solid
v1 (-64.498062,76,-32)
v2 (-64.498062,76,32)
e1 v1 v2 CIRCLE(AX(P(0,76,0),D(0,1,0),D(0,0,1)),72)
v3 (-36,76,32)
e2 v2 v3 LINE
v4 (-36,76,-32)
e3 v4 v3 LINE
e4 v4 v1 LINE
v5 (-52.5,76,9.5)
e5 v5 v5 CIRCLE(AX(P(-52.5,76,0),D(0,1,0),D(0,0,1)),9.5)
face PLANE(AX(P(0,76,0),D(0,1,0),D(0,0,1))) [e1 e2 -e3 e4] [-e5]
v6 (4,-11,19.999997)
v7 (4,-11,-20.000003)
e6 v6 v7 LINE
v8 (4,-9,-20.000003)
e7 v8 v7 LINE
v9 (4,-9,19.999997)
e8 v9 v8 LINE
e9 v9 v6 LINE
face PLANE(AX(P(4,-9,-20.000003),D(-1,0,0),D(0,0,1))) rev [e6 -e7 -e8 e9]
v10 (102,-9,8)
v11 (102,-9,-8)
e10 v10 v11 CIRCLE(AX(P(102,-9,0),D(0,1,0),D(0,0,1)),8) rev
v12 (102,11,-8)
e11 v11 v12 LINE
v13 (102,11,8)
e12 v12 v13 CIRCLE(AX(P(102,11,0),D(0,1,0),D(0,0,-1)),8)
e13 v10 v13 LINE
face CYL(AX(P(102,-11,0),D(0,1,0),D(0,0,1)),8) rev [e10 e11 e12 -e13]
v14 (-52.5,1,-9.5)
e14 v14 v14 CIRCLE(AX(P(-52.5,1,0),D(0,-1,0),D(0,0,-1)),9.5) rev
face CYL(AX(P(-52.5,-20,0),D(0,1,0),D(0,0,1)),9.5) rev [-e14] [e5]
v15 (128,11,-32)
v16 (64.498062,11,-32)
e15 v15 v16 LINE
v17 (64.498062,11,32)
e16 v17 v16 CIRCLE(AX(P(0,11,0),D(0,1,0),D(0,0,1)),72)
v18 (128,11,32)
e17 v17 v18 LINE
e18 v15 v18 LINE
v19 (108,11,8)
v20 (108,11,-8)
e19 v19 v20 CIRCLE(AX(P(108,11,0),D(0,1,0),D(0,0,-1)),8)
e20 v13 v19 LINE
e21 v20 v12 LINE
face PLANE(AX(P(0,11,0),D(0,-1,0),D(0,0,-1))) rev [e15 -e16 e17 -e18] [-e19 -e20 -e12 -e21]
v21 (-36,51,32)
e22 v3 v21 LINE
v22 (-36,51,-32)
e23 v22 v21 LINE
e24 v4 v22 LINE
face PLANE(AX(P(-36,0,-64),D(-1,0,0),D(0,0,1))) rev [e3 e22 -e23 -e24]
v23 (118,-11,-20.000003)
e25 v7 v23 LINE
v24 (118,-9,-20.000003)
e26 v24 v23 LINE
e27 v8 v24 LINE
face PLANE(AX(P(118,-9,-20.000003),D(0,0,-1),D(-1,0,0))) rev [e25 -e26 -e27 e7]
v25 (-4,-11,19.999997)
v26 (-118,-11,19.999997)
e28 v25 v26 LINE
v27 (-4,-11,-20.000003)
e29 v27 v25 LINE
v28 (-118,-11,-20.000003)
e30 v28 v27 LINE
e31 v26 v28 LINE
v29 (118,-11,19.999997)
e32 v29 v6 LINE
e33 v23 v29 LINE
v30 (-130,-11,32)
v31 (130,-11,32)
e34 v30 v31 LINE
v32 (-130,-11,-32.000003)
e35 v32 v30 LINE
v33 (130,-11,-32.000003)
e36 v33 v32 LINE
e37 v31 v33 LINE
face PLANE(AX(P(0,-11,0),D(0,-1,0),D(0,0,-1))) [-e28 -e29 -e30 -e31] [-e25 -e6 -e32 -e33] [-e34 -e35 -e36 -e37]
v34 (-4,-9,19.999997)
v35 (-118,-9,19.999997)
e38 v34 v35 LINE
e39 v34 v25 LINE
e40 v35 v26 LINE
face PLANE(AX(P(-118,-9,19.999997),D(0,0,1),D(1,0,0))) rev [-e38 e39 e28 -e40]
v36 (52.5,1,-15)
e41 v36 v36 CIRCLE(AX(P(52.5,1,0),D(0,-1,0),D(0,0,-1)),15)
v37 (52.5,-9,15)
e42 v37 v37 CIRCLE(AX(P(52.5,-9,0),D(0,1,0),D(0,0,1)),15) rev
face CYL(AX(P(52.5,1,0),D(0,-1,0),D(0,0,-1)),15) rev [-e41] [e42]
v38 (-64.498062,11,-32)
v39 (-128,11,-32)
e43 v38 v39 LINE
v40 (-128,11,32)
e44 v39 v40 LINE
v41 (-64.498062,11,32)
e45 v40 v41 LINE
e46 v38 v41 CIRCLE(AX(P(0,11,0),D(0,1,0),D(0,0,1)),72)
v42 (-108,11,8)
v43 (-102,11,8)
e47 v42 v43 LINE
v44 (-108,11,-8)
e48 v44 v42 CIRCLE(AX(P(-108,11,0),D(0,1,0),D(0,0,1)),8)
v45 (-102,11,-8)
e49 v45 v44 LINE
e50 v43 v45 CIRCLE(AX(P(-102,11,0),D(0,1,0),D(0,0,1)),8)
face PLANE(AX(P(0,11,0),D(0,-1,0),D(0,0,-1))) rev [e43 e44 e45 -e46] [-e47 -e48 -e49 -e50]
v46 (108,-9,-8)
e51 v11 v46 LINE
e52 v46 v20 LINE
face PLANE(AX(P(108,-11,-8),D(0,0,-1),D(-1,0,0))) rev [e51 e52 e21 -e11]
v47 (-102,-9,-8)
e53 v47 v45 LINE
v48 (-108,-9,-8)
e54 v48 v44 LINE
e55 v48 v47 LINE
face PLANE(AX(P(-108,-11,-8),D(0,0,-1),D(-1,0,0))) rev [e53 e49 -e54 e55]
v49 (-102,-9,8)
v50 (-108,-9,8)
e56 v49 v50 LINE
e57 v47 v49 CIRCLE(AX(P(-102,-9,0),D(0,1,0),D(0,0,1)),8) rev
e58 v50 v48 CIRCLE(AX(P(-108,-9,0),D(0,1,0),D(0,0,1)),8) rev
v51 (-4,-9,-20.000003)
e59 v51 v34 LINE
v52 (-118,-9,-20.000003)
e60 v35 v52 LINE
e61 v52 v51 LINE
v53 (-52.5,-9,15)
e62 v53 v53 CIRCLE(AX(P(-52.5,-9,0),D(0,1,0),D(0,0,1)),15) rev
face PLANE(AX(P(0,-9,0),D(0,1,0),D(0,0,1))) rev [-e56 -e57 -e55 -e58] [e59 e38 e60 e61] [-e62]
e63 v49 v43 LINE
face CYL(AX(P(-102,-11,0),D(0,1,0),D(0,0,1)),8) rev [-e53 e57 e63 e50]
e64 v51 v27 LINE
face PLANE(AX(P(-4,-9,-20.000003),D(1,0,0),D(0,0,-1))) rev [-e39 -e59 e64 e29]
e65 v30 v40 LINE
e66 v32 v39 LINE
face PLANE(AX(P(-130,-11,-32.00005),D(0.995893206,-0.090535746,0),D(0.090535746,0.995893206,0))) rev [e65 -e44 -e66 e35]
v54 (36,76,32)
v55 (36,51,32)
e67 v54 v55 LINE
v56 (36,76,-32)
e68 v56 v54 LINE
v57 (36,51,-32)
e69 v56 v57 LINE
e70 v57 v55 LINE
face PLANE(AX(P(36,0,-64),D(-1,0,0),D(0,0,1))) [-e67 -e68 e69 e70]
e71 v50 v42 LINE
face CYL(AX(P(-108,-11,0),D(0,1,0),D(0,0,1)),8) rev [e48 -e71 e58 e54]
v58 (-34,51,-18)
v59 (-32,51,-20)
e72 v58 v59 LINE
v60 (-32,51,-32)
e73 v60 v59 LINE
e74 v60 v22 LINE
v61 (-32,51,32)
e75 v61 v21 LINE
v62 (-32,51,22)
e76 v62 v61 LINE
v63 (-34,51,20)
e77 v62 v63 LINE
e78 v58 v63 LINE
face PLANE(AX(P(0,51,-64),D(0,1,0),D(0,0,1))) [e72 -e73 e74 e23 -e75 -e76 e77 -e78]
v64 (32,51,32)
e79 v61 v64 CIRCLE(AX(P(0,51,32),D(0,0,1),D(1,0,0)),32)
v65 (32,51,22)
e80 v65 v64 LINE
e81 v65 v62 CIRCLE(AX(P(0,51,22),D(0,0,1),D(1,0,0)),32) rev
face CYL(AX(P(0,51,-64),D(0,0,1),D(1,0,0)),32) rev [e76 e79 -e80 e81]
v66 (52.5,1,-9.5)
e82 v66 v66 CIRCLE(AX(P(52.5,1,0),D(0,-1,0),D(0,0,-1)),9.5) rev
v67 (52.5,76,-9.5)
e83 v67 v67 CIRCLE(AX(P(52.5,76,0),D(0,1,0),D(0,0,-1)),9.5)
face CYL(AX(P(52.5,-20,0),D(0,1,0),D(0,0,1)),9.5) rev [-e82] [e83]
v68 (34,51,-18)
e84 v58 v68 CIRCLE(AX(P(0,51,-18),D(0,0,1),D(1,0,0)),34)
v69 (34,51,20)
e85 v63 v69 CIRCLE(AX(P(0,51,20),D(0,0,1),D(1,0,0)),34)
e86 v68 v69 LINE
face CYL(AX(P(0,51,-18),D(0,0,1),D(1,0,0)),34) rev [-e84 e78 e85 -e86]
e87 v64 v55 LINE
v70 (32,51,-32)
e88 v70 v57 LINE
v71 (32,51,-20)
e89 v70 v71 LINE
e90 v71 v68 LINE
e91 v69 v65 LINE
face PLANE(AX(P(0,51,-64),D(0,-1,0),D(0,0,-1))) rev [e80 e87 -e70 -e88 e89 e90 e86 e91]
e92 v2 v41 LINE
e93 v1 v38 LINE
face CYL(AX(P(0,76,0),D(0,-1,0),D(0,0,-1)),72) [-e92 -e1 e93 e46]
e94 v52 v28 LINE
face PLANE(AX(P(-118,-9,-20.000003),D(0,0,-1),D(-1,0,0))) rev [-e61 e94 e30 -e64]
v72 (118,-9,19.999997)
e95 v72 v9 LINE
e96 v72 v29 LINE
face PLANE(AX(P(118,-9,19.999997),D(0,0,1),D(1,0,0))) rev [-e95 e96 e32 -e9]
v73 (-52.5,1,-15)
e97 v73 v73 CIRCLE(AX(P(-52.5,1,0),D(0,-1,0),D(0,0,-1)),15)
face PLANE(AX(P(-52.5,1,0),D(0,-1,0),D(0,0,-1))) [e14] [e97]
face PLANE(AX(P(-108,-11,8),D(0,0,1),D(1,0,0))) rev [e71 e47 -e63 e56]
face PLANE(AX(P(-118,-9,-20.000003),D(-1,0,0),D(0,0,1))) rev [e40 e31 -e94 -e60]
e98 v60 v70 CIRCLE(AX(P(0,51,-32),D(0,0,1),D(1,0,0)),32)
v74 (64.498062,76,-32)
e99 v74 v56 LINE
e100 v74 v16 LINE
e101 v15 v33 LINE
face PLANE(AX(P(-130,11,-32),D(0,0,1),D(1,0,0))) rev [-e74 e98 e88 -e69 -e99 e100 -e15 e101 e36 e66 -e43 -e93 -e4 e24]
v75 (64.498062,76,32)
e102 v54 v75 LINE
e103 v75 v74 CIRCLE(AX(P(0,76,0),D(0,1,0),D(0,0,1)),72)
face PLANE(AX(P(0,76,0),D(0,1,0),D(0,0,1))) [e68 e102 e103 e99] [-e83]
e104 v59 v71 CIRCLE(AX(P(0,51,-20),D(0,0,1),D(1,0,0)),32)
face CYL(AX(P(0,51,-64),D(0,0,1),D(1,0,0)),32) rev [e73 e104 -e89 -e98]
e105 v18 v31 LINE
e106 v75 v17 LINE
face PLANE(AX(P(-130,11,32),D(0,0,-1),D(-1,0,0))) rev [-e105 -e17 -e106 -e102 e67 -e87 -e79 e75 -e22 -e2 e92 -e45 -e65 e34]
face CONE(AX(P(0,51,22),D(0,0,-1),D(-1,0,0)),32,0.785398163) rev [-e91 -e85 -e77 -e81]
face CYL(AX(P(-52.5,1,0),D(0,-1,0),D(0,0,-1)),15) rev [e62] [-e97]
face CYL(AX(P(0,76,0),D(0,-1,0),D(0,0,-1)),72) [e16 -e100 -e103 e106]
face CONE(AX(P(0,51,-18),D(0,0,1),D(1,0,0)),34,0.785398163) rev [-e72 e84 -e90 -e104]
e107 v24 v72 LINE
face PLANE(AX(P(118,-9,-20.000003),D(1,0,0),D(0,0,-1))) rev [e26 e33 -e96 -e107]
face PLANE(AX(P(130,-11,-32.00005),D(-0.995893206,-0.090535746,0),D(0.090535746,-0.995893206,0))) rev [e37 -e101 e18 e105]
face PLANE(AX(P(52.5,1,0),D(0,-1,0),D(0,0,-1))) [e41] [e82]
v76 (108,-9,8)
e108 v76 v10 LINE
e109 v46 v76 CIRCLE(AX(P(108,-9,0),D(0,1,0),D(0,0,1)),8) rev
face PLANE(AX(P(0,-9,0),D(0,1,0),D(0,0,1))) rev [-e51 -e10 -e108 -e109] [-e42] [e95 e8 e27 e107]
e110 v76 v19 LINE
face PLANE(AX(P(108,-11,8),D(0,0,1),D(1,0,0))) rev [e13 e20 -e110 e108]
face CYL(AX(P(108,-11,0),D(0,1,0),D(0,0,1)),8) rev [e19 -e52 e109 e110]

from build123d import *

# Parameters (mm, degrees)
SKETCH1_W           = 260
SKETCH1_H           = 64
BOSS_EXTRUDE1_DEPTH = 11
CUT_EXTRUDE1_DEPTH  = 22
BOSS_EXTRUDE2_DEPTH = 65
CUT_EXTRUDE2_DEPTH  = 164.621514478
CUT_EXTRUDE3_DEPTH  = 96
SKETCH6_R           = 9.5
CUT_EXTRUDE4_DEPTH  = 96
SKETCH7_R           = 15
CUT_EXTRUDE5_DEPTH  = 12
CUT_EXTRUDE7_START  = -12
CUT_EXTRUDE7_DEPTH  = 38
CHAMFER1_SIZE       = 2
CHAMFER2_SIZE       = 2
SKETCH13_W          = 114
SKETCH13_H          = 40
CUT_EXTRUDE8_DEPTH  = 2


with BuildPart() as part:
    # Sketch1 → Boss-Extrude1 (new, symmetric)
    with BuildSketch(Plane(origin=(0, 0, 0), x_dir=(1, 0, 0), z_dir=(0, 1, 0))):
        Rectangle(SKETCH1_W, SKETCH1_H)
    extrude(amount=BOSS_EXTRUDE1_DEPTH, both=True)

    # Sketch2 → Cut-Extrude1 (cut)
    with BuildSketch(Plane(origin=(0, 11, 0), x_dir=(1, 0, 0), z_dir=(0, 1, 0))):
        with BuildLine():
            Line((-108, 8), (-102, 8))
            ThreePointArc((-102, 8), (-94, 0), (-102, -8))
            Line((-102, -8), (-108, -8))
            ThreePointArc((-108, -8), (-116, 0), (-108, 8))
        make_face()
        with BuildLine():
            Line((108, 8), (102, 8))
            ThreePointArc((102, 8), (94, 0), (102, -8))
            Line((102, -8), (108, -8))
            ThreePointArc((108, -8), (116, 0), (108, 8))
        make_face()
    extrude(amount=-CUT_EXTRUDE1_DEPTH, mode=Mode.SUBTRACT)

    # Sketch3 → Boss-Extrude2 (add)
    with BuildSketch(Plane(origin=(0, 11, 0), x_dir=(1, 0, 0), z_dir=(0, 1, 0))):
        with BuildLine():
            Line((-64.498061986, 32), (64.498061986, 32))
            ThreePointArc((64.498061986, 32), (72, 0), (64.498061986, -32))
            Line((64.498061986, -32), (-64.498061986, -32))
            ThreePointArc((-64.498061986, -32), (-72, 0), (-64.498061986, 32))
        make_face()
    extrude(amount=BOSS_EXTRUDE2_DEPTH)

    # Sketch4 → Cut-Extrude2 (cut, through all)
    with BuildSketch(Plane.XY.offset(32)):
        Polygon((-130, 11), (-128, 11), (-130, -11), align=None)
        Polygon((130, -11), (128, 11), (130, 11), align=None)
    extrude(amount=-CUT_EXTRUDE2_DEPTH, mode=Mode.SUBTRACT)

    # Sketch5 → Cut-Extrude3 (cut)
    with BuildSketch(Plane.XY.offset(32)):
        with BuildLine():
            Line((-19.974984355, 76), (-36, 76))
            Line((-36, 76), (-36, 51))
            Line((-36, 51), (-32, 51))
            ThreePointArc((-32, 51), (0, 19), (32, 51))
            Line((32, 51), (36, 51))
            Line((36, 51), (36, 76))
            Line((36, 76), (-19.974984355, 76))
        make_face()
    extrude(amount=-CUT_EXTRUDE3_DEPTH, mode=Mode.SUBTRACT)

    # Sketch6 → Cut-Extrude4 (cut)
    with BuildSketch(Plane(origin=(0, 76, 0), x_dir=(1, 0, 0), z_dir=(0, 1, 0))):
        with Locations(Location((-52.5, 0, 0), (0, 0, 270))):
            Circle(SKETCH6_R)
        with Locations(Location((52.5, 0, 0), (0, 0, 90))):
            Circle(SKETCH6_R)
    extrude(amount=-CUT_EXTRUDE4_DEPTH, mode=Mode.SUBTRACT)

    # Sketch7 → Cut-Extrude5 (cut)
    with BuildSketch(Plane.XZ.offset(11)):
        with Locations(Location((-52.5, 0, 0), (0, 0, 270))):
            Circle(SKETCH7_R)
        with Locations(Location((52.5, 0, 0), (0, 0, 270))):
            Circle(SKETCH7_R)
    extrude(amount=-CUT_EXTRUDE5_DEPTH, mode=Mode.SUBTRACT)

    # Sketch10 → Cut-Extrude7 (cut)
    with BuildSketch(Plane.XY.offset(32).offset(CUT_EXTRUDE7_START)):
        with BuildLine():
            Line((-34, 51), (34, 51))
            ThreePointArc((34, 51), (0, 17), (-34, 51))
        make_face()
    extrude(amount=-CUT_EXTRUDE7_DEPTH, mode=Mode.SUBTRACT)

    # Chamfer1
    chamfer1_edges = [part.edges().sort_by_distance(p)[0] for p in [
        (0, 19, 20),
    ]]
    chamfer(chamfer1_edges, length=CHAMFER1_SIZE - 0.0001)  # a hair under: the kernel refuses the full size

    # Chamfer2
    chamfer2_edges = [part.edges().sort_by_distance(p)[0] for p in [
        (0, 19, -18),
    ]]
    chamfer(chamfer2_edges, length=CHAMFER2_SIZE - 0.0001)  # a hair under: the kernel refuses the full size

    # Sketch13 → Cut-Extrude8 (cut)
    with BuildSketch(Plane.XZ.offset(11)):
        with Locations((-61, -2.5e-06)):
            Rectangle(SKETCH13_W, SKETCH13_H)
        with Locations((61, -2.5e-06)):
            Rectangle(SKETCH13_W, SKETCH13_H)
    extrude(amount=-CUT_EXTRUDE8_DEPTH, mode=Mode.SUBTRACT)


solid = part.part
